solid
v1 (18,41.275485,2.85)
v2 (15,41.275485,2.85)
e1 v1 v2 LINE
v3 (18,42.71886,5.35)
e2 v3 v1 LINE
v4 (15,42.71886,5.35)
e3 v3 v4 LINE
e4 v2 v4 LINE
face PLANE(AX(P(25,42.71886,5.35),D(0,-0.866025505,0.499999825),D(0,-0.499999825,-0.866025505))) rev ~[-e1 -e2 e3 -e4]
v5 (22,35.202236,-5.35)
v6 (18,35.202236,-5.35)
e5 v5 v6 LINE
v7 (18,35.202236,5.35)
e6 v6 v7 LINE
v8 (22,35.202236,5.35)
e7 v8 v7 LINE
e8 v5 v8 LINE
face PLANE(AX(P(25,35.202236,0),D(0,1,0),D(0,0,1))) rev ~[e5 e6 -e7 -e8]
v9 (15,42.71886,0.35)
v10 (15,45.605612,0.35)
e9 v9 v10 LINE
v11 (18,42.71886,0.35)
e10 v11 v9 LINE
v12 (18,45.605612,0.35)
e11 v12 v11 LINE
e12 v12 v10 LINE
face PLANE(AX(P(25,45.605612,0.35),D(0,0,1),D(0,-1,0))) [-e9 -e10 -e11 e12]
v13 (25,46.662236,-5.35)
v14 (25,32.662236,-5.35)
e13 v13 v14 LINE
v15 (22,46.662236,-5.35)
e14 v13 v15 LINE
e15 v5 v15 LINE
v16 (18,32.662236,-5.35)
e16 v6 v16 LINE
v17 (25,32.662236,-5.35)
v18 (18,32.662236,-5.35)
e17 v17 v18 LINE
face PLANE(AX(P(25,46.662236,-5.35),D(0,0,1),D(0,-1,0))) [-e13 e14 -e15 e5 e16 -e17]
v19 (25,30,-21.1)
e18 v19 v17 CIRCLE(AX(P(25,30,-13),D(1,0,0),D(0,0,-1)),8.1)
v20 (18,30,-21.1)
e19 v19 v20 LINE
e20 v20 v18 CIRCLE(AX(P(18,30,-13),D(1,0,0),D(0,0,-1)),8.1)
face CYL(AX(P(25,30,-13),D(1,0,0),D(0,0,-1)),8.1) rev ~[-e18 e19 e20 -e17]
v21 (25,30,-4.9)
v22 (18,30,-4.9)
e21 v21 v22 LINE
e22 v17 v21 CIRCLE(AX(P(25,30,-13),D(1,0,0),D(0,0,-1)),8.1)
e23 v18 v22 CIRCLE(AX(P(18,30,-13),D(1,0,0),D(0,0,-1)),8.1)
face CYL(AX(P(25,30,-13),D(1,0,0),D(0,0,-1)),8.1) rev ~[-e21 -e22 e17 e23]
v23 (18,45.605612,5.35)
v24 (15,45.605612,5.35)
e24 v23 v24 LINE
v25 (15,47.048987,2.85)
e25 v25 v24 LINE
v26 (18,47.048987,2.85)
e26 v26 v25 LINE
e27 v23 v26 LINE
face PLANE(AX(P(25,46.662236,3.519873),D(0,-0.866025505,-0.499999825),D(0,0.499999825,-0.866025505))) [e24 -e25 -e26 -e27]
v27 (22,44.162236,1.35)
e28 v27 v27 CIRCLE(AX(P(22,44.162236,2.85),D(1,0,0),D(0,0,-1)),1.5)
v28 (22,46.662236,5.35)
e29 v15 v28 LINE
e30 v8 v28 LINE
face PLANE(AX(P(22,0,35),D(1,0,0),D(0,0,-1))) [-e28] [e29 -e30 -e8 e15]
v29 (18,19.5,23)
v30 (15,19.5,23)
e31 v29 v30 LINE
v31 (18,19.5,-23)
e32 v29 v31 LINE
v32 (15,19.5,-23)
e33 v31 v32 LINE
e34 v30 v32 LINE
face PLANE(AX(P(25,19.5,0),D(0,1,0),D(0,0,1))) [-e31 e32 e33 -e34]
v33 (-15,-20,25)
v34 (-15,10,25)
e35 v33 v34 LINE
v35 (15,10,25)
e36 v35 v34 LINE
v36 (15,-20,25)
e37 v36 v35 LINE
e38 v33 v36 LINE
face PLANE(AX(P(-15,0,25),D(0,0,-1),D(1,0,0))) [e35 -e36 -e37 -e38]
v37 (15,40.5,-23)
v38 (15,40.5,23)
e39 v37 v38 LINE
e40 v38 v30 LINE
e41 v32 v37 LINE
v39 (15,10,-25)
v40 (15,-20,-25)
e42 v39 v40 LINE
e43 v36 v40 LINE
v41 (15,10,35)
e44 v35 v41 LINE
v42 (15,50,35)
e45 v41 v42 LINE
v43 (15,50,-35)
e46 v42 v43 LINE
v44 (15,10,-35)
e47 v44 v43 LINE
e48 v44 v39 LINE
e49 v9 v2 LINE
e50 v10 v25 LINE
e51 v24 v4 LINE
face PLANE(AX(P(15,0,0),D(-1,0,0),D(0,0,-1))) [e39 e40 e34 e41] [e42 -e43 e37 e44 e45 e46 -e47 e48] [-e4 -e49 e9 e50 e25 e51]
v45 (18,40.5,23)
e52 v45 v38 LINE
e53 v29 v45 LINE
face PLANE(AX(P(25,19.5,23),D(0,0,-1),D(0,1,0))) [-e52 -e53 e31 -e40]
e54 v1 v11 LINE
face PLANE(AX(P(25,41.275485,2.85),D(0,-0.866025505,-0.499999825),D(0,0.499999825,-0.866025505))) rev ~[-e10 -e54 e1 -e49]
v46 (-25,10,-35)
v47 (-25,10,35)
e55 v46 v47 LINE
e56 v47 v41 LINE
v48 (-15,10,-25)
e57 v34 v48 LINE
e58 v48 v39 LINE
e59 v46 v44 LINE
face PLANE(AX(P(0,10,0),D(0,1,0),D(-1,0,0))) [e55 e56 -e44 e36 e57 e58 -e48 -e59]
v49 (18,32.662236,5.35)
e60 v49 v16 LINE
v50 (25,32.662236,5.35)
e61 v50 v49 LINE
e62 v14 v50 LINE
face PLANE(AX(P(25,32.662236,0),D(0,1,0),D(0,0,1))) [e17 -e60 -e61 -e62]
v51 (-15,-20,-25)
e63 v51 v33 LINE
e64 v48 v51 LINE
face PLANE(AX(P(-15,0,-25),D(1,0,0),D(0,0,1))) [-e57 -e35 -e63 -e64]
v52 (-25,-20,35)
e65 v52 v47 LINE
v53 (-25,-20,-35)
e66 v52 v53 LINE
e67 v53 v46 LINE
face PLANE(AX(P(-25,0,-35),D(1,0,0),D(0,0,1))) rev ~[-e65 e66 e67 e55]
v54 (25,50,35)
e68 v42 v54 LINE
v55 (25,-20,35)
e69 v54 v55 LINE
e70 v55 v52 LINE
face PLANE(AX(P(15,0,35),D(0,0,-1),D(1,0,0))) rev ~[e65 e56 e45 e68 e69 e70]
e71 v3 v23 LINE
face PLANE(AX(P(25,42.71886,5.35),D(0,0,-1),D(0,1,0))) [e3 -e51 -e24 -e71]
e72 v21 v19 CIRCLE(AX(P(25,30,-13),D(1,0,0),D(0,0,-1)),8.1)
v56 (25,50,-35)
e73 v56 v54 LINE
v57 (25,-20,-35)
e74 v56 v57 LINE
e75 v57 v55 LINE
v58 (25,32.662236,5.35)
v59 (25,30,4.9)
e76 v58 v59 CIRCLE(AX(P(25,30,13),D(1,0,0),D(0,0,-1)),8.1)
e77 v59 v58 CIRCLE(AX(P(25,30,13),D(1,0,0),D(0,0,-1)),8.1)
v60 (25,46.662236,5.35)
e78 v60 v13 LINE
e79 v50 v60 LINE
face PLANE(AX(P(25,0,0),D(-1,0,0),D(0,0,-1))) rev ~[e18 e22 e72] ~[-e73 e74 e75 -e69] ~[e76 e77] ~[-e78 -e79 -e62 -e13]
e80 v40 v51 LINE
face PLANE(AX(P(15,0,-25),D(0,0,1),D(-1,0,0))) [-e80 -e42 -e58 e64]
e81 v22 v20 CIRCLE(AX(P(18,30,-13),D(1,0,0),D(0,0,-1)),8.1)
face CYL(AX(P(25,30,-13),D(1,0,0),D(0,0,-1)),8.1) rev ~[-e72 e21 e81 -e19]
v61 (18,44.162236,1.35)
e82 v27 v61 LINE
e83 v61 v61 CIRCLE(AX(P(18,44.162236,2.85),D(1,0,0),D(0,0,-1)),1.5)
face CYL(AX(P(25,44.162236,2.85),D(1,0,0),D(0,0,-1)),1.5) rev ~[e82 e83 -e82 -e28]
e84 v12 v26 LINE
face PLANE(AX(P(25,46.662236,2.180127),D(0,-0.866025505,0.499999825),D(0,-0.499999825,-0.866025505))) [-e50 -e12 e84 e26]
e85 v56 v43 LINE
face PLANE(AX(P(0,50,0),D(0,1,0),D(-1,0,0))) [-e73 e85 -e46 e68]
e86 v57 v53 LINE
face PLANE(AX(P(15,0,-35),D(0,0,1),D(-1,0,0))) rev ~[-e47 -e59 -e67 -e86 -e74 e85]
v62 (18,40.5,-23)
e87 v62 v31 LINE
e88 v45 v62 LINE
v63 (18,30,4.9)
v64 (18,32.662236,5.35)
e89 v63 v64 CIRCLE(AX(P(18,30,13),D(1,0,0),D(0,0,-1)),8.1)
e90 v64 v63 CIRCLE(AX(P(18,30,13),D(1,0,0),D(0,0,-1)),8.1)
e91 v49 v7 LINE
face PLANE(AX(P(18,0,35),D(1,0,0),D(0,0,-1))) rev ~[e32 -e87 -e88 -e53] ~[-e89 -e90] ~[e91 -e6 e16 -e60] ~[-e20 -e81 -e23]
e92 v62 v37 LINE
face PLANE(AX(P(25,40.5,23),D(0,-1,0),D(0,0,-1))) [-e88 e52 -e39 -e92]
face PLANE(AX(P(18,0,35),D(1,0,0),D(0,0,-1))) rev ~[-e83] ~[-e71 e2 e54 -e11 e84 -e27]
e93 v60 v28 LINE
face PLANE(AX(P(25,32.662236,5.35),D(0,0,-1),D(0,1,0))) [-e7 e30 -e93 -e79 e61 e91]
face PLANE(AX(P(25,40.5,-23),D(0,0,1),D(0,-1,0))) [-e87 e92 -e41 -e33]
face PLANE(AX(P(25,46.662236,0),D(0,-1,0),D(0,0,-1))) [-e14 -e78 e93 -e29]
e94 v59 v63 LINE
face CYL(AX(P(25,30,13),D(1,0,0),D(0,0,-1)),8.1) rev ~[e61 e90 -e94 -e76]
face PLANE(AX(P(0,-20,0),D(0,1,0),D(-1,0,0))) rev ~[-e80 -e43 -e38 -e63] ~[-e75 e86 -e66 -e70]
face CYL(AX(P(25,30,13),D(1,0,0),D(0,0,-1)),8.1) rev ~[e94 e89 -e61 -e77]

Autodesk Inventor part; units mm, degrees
ref_plane "YZ Plane" through (0, 0, 0) normal (1, 0, 0) x (0, 1, 0)
ref_plane "XZ Plane" through (0, 0, 0) normal (0, 1, 0) x (-1, 0, 0)
ref_plane "XY Plane" through (0, 0, 0) normal (0, 0, 1) x (1, 0, 0)
sketch "Szkic7" plane through (0, 0, 0) normal (0, 1, 0) x (-1, 0, 0)
  line L0 (0, -49) -> (0, 49) projected
  line L1 (35, 0) -> (-35, 0) projected
  line L2 (15, 25) -> (-15, 25)
  line L3 (-15, 25) -> (-15, -25)
  line L4 (-15, -25) -> (15, -25)
  line L5 (15, -25) -> (15, 25)
  line L6 (15, 25) -> (-15, -25) construction
  line L7 (-15, 25) -> (15, -25) construction
  line L8 (25, 35) -> (-25, 35)
  line L9 (-25, 35) -> (-25, -35)
  line L10 (-25, -35) -> (25, -35)
  line L11 (25, -35) -> (25, 35)
  line L12 (25, 35) -> (-25, -35) construction
  line L13 (-25, 35) -> (25, -35) construction
  line L14 (-15, 25) -> (-15, 35)
  line L15 (-15, -25) -> (-15, -35)
  point P0 (0, 0)
  dimension "d40" = 30
  dimension "d41" = 50
  dimension "d42" = 50
  dimension "d43" = 70
extrude "Wyciągnięcie proste6" add sketch "Szkic7" along normal blind 10 contours L10 L15 L4 L0 | L0 L4 L5 L1 L11 L10 | L10 L9 L1 L3 L15 | L1 L5 L2 L0 L8 L11 | L2 L14 L8 L0 | L1 L9 L8 L14 L3
extrude "Wyciągnięcie proste7" add sketch "Szkic7" along normal blind 50 contours L10 L9 L1 L3 L15 | L1 L9 L8 L14 L3
sketch "Szkic8" plane through (25, 0, 35) normal (1, 0, 0) x (0, 0, -1)
  line L0 (0, 10) -> (70, 10)
  line L1 (70, 10) -> (70, 50)
  line L2 (70, 50) -> (0, 50)
  line L3 (0, 50) -> (0, 10)
  line L4 (35, 50) -> (35, 10)
  circle A0 centre (48, 30) radius 8.1
  line L5 (48, 30) -> (35, 30)
  circle A1 centre (22, 30) radius 8.1
  line L6 (29.65, 46.662236) -> (40.35, 46.662236)
  line L7 (40.35, 46.662236) -> (40.35, 32.662236)
  line L8 (40.35, 32.662236) -> (29.65, 32.662236)
  line L9 (29.65, 32.662236) -> (29.65, 46.662236)
  line L10 (29.65, 46.662236) -> (40.35, 32.662236) construction
  line L11 (40.35, 46.662236) -> (29.65, 32.662236) construction
  circle A2 centre (32.15, 44.162236) radius 1.5
  line L12 (29.65, 44.162236) -> (30.65, 44.162236) construction
  line L13 (32.15, 46.662236) -> (32.15, 45.662236) construction
  line L14 (35, 32.662236) -> (35, 35.202236)
  line L15 (35, 35.202236) -> (40.35, 35.202236)
  line L16 (35, 35.202236) -> (29.65, 35.202236)
  circle A3 centre (32.15, 44.162236) radius 2.5 construction
  line L17 (29.65, 42.71886) -> (32.15, 41.275485)
  line L18 (32.15, 41.275485) -> (34.65, 42.71886)
  line L19 (29.65, 42.71886) -> (29.65, 45.605612)
  line L20 (29.65, 45.605612) -> (32.15, 47.048987)
  line L21 (32.15, 47.048987) -> (34.65, 45.605612)
  line L22 (34.65, 45.605612) -> (34.65, 42.71886)
  line L23 (12, 40.5) -> (58, 40.5)
  line L24 (58, 40.5) -> (58, 19.5)
  line L25 (58, 19.5) -> (12, 19.5)
  line L26 (12, 19.5) -> (12, 40.5)
  line L27 (12, 40.5) -> (58, 19.5) construction
  line L28 (58, 40.5) -> (12, 19.5) construction
  point P0 (35, 39.662236)
  point P1 (9.59459, 19.012494)
  point P2 (9.59459, 19.012494)
  point P3 (12.764463, 33.012494)
  point P4 (11.424717, 33.012494)
  point P5 (9.59459, 29.069118)
  point P6 (32.819873, 46.662236)
  point P7 (31.480127, 46.662236)
  dimension "d62" = 16.2
  dimension "d63" = 13
  dimension "d64" = 10.7
  dimension "d65" = 14
  dimension "d66" = 3
  dimension "d67" = 1
  dimension "d68" = 1
  dimension "d69" = 2.54
  dimension "d70" = 5
  dimension "d71" = 120
  dimension "d72" = 120
  dimension "d73" = 120
  dimension "d74" = 120
  dimension "d75" = 120
  dimension "d76" = 40
  dimension "d77" = 46
  dimension "d78" = 21
extrude "Wyciągnięcie proste8" cut sketch "Szkic8" against normal through all contours A1 | L25 L26 L23 L9 L8 L4 | L4 L5 A0 L7 L23 L24 L25 | L4 L8 A0 L5 | L8 L9 L16 L4 | L4 L15 L7 L8 | A0 | L23 L7 L15 L4 | L4 L16 L9 L23 | L21 L22 L18 L17 L9 L20 L6 | L6 L20 L21 | A2
extrude "Wyciągnięcie proste9" add sketch "Szkic8" against normal blind 7 contours L25 L26 L23 L9 L8 L4 | L4 L5 A0 L7 L23 L24 L25 | L4 L8 A0 L5 | L23 L7 L15 L4 | L4 L16 L9 L23 | L21 L22 L18 L17 L9 L20 L6 | L6 L20 L21
extrude "Wyciągnięcie proste10" cut sketch "Szkic8" against normal blind 3 contours L6 L7 L23 L4 | L4 L23 L9 L17 L18 L22 L21 L6 | L23 L7 L15 L4 | L4 L16 L9 L23 | L21 L22 L18 L17 L9 L20 L6 | L20 L9 L6
extrude "Wyciągnięcie proste11" add sketch "Szkic7" against normal blind 20 contours L10 L15 L4 L0 | L0 L4 L5 L1 L11 L10 | L10 L9 L1 L3 L15 | L1 L5 L2 L0 L8 L11 | L2 L14 L8 L0 | L1 L9 L8 L14 L3
properties part number "uMule-UDaR-sensor"
